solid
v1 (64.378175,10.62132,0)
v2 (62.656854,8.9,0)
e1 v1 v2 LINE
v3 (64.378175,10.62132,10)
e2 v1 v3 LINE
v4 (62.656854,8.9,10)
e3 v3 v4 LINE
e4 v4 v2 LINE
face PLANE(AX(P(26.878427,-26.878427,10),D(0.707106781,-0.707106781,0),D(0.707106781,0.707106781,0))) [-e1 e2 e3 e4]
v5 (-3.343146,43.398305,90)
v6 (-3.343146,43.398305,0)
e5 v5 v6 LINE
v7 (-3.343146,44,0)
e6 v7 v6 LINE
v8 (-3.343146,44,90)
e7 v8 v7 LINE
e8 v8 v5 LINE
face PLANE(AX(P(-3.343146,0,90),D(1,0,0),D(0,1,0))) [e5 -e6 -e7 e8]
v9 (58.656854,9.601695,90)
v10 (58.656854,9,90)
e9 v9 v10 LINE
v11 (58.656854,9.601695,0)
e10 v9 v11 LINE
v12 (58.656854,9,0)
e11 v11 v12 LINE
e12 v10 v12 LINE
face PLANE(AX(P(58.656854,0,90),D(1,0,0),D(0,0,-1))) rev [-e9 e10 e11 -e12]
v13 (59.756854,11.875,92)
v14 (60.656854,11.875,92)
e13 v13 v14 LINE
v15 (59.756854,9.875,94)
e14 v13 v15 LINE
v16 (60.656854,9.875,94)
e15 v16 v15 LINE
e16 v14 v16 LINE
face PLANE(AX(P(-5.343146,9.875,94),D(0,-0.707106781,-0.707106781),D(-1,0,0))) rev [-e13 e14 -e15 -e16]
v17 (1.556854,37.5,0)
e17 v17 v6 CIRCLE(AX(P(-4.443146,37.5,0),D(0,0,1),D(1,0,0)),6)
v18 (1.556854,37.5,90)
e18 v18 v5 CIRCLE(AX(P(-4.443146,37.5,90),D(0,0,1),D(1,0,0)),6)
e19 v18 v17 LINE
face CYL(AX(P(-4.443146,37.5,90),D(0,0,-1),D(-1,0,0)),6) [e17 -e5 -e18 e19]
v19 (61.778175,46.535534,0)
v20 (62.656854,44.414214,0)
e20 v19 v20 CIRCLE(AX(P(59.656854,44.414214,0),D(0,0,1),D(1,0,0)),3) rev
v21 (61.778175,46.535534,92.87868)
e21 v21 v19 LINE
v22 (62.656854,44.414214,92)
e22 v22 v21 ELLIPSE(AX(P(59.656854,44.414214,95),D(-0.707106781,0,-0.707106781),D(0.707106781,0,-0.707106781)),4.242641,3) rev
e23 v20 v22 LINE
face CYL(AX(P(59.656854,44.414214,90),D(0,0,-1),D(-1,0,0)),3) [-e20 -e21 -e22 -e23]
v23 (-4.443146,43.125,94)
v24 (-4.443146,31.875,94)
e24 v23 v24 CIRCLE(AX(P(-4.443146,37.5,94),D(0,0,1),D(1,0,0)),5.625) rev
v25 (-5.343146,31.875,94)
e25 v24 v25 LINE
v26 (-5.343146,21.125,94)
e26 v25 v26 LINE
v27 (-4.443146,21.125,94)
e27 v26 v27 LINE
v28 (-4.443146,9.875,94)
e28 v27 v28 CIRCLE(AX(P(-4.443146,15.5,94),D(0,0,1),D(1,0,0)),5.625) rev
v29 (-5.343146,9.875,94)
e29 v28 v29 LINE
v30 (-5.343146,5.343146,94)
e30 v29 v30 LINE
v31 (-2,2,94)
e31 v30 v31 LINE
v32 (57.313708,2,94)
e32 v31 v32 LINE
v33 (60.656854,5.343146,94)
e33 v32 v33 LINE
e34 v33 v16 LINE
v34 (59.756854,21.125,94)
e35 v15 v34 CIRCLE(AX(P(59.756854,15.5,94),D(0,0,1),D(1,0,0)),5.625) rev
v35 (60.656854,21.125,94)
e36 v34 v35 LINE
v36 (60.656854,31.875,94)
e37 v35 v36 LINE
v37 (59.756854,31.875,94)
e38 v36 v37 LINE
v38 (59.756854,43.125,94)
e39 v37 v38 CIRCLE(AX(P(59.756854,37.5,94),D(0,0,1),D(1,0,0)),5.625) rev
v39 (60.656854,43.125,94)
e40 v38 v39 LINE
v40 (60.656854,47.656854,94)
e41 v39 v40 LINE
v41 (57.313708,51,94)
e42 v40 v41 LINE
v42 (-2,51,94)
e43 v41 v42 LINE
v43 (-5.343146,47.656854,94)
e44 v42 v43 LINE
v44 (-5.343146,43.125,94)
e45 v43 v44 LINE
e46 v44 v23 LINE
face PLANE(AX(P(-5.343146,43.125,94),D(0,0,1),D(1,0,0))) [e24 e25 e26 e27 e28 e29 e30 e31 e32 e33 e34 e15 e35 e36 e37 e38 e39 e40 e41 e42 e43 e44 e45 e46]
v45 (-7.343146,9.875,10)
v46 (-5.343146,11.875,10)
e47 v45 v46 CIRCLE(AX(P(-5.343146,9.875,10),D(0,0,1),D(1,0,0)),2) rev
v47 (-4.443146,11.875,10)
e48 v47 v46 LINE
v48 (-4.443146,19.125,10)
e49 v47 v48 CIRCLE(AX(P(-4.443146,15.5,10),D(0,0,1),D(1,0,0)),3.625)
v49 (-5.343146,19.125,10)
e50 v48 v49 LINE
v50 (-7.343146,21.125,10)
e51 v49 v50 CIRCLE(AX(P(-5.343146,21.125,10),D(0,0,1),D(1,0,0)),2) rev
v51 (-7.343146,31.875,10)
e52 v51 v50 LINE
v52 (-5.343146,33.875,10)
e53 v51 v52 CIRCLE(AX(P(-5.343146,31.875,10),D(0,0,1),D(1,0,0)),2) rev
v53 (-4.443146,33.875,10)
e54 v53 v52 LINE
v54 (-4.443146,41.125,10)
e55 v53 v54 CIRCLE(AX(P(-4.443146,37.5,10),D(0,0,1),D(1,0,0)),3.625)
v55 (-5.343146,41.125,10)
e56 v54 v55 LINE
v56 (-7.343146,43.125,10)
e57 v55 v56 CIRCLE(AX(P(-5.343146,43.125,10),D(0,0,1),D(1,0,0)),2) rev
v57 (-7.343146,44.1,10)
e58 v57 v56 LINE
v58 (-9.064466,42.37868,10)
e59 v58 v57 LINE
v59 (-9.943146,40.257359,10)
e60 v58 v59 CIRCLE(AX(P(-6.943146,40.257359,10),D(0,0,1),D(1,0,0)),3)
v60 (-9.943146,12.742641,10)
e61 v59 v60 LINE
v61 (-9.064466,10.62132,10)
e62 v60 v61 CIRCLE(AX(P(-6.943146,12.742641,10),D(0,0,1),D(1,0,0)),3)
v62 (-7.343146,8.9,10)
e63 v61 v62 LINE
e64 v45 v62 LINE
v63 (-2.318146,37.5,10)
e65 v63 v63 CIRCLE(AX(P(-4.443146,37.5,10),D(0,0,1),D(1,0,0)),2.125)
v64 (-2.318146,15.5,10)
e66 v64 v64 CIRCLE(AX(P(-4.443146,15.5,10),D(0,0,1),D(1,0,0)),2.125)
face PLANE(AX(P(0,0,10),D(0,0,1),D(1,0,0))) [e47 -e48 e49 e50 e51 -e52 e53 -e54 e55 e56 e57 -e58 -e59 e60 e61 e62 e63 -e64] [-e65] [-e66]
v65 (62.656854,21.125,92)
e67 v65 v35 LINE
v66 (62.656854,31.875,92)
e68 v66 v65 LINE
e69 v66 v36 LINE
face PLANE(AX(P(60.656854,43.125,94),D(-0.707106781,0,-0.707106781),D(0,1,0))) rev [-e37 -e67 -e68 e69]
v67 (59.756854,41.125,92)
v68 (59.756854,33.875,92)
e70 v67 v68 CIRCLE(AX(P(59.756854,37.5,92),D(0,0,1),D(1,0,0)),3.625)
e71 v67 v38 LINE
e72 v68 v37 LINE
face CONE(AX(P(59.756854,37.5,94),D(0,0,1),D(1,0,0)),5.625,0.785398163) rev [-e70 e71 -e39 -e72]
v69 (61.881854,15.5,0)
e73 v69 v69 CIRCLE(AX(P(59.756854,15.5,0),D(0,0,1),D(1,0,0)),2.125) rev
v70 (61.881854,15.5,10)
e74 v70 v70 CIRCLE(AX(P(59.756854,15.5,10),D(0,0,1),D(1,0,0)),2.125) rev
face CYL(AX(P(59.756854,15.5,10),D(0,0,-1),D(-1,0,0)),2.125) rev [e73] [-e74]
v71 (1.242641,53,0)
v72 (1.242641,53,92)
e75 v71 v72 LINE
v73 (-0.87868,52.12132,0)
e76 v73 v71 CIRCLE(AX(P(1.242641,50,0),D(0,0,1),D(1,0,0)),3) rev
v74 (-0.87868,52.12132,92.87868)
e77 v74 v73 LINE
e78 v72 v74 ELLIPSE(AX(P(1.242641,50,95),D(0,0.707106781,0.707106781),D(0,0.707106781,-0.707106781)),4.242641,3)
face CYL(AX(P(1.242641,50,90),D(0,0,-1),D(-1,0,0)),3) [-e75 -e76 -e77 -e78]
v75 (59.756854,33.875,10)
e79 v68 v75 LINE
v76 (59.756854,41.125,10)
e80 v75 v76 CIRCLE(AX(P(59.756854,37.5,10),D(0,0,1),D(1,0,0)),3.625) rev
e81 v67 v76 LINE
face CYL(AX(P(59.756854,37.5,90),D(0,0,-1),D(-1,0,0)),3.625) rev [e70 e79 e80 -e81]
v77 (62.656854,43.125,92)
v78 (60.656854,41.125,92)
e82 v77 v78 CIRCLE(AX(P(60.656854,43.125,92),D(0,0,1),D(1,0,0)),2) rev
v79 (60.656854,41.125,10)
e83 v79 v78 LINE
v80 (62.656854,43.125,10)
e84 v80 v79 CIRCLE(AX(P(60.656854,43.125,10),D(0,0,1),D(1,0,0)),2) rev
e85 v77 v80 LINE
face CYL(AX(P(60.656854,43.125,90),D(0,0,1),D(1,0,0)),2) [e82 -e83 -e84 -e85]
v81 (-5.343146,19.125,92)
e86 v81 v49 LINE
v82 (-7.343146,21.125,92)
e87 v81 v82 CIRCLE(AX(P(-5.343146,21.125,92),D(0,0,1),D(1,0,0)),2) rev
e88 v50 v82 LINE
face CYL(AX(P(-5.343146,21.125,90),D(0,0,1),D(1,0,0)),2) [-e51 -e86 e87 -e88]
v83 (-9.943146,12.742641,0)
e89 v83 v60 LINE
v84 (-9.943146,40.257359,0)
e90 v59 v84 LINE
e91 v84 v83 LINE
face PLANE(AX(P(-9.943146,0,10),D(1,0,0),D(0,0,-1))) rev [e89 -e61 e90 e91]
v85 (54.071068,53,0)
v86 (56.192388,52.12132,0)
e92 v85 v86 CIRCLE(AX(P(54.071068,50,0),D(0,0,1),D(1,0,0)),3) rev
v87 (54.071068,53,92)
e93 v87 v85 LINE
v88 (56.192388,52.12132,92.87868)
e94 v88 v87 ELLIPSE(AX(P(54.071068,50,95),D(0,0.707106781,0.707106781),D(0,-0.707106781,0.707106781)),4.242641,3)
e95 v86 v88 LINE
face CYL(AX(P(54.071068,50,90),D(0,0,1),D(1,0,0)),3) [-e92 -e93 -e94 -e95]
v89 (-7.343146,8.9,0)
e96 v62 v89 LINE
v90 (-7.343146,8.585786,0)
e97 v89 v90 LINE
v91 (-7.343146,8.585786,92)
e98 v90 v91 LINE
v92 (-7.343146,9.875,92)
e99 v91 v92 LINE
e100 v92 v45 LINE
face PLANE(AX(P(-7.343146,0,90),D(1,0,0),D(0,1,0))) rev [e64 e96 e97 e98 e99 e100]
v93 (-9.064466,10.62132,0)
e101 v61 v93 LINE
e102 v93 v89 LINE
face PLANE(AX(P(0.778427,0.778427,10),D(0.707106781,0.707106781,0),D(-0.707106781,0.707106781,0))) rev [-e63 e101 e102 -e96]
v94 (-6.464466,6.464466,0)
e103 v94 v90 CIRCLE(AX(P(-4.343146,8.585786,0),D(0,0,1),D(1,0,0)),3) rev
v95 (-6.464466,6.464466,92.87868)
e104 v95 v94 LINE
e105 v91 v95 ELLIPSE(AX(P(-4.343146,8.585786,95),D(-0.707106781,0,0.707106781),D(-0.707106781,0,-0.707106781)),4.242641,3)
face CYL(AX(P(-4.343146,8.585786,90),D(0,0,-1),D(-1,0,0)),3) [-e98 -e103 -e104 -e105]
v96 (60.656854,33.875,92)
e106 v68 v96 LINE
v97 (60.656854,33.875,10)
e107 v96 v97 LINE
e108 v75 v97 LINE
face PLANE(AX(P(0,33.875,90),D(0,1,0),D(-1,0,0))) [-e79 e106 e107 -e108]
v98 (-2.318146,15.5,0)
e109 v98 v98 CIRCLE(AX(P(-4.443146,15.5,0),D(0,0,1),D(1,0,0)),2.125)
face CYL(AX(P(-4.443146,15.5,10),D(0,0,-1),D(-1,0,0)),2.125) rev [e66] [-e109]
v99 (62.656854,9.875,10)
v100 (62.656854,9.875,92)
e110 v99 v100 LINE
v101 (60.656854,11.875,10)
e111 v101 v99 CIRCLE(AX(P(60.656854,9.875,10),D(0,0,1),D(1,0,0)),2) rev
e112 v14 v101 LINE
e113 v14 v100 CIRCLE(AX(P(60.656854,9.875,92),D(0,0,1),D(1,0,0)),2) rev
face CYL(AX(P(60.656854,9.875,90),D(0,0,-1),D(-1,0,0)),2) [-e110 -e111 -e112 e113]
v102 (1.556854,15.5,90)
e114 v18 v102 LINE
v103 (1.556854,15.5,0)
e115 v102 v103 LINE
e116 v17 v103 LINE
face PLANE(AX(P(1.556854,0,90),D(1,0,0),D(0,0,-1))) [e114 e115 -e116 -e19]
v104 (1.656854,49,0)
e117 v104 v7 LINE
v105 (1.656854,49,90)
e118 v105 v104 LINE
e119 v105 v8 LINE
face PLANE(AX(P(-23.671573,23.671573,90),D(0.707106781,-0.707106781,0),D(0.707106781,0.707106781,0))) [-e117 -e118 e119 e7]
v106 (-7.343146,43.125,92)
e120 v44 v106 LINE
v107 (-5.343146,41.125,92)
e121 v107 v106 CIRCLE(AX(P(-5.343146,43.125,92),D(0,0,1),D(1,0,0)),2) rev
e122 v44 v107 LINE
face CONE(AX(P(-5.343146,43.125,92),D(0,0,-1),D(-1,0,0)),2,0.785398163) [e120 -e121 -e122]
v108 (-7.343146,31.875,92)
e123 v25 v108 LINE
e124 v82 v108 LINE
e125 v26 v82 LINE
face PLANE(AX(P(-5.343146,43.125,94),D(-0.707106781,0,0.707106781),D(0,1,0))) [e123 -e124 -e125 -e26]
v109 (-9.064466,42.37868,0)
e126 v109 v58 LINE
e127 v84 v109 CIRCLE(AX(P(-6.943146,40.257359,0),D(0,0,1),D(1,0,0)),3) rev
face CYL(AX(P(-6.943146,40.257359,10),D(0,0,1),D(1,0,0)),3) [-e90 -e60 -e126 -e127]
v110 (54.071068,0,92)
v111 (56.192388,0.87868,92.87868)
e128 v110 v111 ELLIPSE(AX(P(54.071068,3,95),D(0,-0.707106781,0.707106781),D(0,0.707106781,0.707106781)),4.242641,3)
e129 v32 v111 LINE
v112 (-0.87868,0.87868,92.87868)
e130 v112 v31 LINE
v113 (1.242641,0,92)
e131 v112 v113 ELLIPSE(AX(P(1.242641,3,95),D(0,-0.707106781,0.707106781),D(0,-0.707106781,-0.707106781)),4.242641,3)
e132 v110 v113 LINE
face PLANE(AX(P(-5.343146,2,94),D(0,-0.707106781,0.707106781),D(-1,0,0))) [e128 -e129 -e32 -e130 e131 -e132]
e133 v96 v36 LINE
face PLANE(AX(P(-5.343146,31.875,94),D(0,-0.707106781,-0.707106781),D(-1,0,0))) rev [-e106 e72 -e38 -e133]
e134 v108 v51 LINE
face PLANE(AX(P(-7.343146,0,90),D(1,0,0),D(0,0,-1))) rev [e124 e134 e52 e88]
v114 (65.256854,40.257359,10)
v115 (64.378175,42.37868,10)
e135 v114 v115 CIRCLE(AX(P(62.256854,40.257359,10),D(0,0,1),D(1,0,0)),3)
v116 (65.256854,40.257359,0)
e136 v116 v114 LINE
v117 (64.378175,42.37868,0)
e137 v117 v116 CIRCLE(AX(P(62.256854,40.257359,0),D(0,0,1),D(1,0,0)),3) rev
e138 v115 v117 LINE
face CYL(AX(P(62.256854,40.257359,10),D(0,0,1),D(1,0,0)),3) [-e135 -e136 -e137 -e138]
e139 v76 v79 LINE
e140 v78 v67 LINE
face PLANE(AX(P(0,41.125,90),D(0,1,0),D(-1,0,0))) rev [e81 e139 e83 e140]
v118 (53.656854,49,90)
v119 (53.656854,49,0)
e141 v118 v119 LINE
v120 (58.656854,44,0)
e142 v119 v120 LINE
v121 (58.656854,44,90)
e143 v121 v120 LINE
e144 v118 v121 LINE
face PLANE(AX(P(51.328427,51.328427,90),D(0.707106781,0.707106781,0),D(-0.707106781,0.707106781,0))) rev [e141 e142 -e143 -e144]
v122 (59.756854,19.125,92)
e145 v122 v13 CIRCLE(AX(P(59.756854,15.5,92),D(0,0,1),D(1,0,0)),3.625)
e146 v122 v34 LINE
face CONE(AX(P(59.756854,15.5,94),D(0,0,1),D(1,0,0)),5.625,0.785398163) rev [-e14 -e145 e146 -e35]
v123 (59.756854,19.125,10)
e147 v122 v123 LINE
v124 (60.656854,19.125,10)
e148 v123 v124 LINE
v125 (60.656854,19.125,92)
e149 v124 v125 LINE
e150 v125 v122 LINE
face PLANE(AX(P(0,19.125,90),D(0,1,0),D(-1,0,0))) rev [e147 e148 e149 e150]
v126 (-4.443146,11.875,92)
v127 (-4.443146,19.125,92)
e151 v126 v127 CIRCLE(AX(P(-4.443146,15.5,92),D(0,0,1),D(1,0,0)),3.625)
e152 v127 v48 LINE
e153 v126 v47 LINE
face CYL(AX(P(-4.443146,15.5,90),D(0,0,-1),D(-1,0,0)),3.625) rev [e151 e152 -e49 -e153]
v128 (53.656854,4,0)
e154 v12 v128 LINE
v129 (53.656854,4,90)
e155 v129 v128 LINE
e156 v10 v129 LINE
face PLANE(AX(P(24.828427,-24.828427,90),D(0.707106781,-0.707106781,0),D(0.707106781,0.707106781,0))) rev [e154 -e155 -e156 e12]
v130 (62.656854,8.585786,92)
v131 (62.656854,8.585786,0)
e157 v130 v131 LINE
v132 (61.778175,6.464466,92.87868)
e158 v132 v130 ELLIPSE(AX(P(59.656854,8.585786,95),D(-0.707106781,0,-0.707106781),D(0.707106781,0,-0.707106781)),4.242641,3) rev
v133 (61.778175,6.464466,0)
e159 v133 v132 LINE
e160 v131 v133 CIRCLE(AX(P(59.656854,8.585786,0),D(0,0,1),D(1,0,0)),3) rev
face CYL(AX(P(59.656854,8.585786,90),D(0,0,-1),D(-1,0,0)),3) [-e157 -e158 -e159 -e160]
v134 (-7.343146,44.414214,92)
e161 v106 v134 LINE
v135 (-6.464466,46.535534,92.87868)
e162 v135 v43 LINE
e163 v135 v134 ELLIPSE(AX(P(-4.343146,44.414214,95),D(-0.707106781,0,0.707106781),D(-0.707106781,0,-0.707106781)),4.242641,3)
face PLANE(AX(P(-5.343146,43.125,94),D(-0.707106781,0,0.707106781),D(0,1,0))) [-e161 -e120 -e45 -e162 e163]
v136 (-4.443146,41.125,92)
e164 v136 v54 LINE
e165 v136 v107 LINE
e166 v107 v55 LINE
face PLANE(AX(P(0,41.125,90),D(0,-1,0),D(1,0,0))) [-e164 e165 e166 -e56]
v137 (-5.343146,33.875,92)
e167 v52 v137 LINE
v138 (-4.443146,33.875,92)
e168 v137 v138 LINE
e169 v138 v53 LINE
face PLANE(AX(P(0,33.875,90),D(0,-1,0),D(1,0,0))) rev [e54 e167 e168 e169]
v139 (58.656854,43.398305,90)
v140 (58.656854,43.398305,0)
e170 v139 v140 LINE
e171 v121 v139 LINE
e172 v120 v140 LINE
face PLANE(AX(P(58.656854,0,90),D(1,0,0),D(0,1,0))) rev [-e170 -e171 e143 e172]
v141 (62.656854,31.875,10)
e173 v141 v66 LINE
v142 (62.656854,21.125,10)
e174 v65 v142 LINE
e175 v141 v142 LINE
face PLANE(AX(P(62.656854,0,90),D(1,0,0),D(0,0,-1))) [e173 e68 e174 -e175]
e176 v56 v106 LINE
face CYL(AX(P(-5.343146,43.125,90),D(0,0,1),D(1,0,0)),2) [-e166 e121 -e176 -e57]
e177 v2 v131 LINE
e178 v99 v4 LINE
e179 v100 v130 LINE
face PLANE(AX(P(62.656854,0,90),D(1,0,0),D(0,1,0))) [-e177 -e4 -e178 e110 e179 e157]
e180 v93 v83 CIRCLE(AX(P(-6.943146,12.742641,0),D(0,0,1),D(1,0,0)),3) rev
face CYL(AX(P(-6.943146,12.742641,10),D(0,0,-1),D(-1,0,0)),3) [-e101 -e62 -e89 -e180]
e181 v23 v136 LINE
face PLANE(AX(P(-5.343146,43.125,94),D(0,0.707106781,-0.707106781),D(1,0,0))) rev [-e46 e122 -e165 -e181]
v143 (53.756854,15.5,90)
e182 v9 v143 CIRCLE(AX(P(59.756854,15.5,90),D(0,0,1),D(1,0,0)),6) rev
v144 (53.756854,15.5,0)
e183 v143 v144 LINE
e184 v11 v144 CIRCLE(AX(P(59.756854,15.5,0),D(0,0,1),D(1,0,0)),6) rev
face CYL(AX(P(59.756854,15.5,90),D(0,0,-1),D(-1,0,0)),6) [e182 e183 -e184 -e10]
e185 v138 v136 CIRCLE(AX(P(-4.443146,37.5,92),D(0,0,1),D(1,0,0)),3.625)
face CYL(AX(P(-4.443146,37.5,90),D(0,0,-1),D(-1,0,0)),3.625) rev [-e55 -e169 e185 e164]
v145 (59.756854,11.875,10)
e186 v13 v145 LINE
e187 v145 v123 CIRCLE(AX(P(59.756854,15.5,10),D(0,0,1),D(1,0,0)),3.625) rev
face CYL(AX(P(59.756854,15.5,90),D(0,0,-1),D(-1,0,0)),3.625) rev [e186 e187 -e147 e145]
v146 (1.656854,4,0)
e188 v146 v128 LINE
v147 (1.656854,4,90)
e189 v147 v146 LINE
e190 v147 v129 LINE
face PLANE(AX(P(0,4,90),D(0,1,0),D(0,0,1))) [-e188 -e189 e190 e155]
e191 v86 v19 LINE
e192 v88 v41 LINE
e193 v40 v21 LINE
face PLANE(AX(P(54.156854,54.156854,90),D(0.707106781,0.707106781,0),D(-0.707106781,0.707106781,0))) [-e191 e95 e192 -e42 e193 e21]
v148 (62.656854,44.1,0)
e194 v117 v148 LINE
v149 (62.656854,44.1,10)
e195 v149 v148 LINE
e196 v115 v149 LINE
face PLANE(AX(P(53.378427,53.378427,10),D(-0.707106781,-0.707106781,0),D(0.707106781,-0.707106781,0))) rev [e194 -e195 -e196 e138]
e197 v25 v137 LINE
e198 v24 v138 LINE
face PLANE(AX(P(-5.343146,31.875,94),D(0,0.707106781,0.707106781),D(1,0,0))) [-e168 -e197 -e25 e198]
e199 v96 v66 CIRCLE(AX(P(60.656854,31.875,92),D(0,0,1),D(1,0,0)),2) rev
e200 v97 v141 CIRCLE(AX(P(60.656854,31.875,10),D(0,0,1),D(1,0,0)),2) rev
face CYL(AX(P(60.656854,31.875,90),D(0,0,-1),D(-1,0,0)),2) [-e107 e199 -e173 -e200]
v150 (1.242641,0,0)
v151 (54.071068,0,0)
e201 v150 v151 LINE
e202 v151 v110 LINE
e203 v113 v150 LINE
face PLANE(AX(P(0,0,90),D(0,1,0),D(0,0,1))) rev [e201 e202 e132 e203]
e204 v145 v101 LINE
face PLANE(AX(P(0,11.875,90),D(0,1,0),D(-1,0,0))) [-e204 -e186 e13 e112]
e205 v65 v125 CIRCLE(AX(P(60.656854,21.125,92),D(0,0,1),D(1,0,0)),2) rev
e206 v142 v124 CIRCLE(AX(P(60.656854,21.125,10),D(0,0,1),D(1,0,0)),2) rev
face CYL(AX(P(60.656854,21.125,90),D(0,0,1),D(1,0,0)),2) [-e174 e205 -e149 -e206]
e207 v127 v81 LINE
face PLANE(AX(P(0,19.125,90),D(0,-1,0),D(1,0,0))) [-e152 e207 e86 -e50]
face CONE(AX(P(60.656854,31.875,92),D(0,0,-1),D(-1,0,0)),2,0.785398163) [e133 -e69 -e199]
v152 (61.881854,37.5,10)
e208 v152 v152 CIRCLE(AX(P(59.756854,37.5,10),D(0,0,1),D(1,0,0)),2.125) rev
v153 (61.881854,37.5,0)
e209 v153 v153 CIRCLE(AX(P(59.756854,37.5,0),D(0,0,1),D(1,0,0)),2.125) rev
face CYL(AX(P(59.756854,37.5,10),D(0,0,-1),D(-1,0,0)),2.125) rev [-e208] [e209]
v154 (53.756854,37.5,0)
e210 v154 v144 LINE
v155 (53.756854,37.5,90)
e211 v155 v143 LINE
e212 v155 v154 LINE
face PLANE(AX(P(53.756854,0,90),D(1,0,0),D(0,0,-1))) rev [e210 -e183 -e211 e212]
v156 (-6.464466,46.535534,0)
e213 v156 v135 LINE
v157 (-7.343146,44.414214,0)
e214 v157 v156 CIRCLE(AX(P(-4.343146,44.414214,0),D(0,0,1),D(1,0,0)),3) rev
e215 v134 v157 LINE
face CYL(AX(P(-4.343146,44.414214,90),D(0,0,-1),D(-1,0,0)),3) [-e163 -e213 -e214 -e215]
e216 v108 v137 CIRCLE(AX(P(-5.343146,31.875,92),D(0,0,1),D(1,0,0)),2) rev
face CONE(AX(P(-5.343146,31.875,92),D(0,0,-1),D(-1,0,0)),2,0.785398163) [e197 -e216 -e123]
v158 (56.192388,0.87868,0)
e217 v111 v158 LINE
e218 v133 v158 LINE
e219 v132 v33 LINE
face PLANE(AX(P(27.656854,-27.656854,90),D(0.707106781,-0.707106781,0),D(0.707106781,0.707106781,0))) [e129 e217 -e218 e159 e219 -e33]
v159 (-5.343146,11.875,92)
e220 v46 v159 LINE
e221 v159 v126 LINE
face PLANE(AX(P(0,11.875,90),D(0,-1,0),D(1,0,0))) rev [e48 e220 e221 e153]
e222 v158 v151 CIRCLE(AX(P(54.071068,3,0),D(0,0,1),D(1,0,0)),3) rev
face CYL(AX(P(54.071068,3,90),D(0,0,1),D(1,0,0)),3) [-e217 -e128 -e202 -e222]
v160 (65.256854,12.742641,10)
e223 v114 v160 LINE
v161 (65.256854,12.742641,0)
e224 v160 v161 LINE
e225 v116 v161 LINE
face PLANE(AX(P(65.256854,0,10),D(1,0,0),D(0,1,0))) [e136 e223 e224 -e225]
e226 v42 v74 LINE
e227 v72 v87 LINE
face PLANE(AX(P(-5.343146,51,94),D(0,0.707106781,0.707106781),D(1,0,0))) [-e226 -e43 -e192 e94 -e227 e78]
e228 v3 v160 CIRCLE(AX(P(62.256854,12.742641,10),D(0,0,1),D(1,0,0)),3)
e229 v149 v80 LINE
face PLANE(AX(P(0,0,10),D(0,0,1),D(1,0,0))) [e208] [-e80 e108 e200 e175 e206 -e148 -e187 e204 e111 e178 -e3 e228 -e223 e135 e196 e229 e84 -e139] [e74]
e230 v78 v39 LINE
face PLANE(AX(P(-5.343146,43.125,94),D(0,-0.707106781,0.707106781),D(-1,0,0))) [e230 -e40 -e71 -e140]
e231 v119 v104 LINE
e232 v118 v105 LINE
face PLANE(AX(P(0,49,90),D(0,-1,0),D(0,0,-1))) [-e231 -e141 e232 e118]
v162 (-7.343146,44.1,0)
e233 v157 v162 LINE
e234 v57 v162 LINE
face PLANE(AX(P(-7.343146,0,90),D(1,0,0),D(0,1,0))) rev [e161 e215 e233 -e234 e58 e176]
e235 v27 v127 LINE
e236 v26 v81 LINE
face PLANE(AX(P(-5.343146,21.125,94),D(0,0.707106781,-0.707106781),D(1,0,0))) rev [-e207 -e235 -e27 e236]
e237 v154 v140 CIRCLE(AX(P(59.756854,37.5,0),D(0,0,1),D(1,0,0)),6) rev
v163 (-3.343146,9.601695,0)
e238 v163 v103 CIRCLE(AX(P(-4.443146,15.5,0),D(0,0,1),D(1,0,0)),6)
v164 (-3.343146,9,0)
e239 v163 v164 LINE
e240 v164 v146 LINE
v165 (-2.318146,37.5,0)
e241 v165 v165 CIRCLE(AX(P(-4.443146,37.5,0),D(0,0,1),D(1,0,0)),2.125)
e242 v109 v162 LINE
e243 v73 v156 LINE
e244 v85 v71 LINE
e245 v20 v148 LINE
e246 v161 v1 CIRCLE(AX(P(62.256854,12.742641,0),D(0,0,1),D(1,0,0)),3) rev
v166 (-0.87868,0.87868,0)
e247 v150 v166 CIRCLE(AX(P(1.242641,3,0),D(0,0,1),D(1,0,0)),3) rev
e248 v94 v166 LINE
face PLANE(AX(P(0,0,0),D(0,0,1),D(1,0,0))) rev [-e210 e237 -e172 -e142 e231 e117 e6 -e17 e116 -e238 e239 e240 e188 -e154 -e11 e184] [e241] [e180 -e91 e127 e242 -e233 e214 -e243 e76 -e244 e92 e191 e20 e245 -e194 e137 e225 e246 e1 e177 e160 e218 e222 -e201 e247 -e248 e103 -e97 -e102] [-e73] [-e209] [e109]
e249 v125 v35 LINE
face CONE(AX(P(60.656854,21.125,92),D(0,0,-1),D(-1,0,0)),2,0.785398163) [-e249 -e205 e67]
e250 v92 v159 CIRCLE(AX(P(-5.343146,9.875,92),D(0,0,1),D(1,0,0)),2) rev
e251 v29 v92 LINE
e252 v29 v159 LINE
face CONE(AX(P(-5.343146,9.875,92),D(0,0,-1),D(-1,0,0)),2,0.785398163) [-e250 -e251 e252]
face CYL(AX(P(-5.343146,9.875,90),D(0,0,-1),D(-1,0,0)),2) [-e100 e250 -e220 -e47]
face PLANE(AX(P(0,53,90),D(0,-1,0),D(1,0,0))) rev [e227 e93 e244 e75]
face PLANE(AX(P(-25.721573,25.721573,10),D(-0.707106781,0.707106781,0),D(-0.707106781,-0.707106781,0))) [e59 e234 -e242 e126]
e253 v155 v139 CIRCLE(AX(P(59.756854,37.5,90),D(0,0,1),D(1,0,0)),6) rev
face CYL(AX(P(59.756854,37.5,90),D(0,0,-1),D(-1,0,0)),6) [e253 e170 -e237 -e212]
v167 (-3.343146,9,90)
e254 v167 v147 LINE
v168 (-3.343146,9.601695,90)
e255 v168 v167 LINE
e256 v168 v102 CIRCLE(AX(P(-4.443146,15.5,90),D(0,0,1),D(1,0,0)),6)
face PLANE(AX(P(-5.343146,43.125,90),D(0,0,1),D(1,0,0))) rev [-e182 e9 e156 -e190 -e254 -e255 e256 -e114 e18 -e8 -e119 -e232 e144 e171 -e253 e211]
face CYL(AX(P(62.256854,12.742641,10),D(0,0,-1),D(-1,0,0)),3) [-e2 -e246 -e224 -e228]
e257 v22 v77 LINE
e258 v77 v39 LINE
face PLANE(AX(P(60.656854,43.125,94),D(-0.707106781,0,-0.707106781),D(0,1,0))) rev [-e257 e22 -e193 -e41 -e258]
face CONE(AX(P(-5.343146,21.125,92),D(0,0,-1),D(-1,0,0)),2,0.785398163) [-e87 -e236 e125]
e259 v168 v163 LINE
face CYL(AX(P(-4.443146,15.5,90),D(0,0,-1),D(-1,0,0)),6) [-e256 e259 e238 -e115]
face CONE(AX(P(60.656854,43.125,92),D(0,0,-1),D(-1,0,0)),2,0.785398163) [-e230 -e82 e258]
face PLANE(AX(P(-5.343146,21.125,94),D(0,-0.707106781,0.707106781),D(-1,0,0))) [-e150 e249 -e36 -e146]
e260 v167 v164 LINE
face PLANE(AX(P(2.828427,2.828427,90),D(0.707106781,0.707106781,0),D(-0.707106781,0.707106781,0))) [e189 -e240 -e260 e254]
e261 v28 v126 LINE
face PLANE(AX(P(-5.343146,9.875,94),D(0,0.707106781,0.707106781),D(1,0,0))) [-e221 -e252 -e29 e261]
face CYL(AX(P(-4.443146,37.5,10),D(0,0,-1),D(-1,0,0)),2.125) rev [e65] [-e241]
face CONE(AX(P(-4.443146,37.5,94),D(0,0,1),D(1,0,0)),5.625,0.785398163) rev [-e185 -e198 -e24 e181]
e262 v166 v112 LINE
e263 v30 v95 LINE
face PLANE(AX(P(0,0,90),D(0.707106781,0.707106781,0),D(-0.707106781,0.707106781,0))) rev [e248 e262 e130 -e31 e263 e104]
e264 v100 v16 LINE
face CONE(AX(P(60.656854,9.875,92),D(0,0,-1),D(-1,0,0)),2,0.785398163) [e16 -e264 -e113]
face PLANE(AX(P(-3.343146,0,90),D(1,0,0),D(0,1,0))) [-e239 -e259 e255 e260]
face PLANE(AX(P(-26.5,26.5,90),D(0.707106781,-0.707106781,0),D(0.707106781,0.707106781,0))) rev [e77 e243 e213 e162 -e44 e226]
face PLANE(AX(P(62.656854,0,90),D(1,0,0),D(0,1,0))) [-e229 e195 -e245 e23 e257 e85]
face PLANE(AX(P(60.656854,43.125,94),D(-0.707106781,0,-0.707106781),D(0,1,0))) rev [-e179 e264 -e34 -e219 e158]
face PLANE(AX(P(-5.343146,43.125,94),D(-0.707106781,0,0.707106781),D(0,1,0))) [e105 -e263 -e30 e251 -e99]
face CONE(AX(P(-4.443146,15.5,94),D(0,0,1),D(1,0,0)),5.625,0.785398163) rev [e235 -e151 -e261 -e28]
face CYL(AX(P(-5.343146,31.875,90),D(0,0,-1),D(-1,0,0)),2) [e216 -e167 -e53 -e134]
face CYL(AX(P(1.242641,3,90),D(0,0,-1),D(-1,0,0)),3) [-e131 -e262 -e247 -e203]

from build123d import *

# Parameters (mm, degrees)
BOSS_EXTRUDE1_DEPTH = 90
SKETCH1_3_R         = 2.125
BOSS_EXTRUDE2_DEPTH = 10
FILLET1_R           = 2
BOSS_EXTRUDE3_START = 4
BOSS_EXTRUDE3_DEPTH = 4
CHAMFER1_SIZE       = 2
FILLET3_R           = 3


with BuildPart() as part:
    # Sketch1 → Boss-Extrude1 (new body)
    with BuildSketch(Plane.XY):
        with BuildLine():
            Line((55.313708499, 53), (0, 53))
            Line((0, 53), (-7.343145751, 45.656854249))
            Line((-7.343145751, 45.656854249), (-7.343145751, 41.125))
            Line((-7.343145751, 41.125), (-4.443145751, 41.125))
            ThreePointArc((-4.443145751, 41.125), (-0.818145751, 37.5), (-4.443145751, 33.875))
            Line((-4.443145751, 33.875), (-7.343145751, 33.875))
            Line((-7.343145751, 33.875), (-7.343145751, 19.125))
            Line((-7.343145751, 19.125), (-4.443145751, 19.125))
            ThreePointArc((-4.443145751, 19.125), (-0.818145751, 15.5), (-4.443145751, 11.875))
            Line((-4.443145751, 11.875), (-7.343145751, 11.875))
            Line((-7.343145751, 11.875), (-7.343145751, 7.343145751))
            Line((-7.343145751, 7.343145751), (0, 0))
            Line((0, 0), (55.313708499, 0))
            Line((55.313708499, 0), (62.656854249, 7.343145751))
            Line((62.656854249, 7.343145751), (62.656854249, 11.875))
            Line((62.656854249, 11.875), (59.756854249, 11.875))
            ThreePointArc((59.756854249, 11.875), (56.131854249, 15.5), (59.756854249, 19.125))
            Line((59.756854249, 19.125), (62.656854249, 19.125))
            Line((62.656854249, 19.125), (62.656854249, 33.875))
            Line((62.656854249, 33.875), (59.756854249, 33.875))
            ThreePointArc((59.756854249, 33.875), (56.131854249, 37.5), (59.756854249, 41.125))
            Line((59.756854249, 41.125), (62.656854249, 41.125))
            Line((62.656854249, 41.125), (62.656854249, 45.656854249))
            Line((62.656854249, 45.656854249), (55.313708499, 53))
        make_face()
        with BuildLine():
            Line((53.656854249, 4), (1.656854249, 4))
            Line((1.656854249, 4), (-3.343145751, 9))
            Line((-3.343145751, 9), (-3.343145751, 9.601695159))
            ThreePointArc((-3.343145751, 9.601695159), (0.172046553, 11.665942097), (1.556854249, 15.5))
            Line((1.556854249, 15.5), (1.556854249, 37.5))
            ThreePointArc((1.556854249, 37.5), (0.172046553, 41.334057903), (-3.343145751, 43.398304841))
            Line((-3.343145751, 43.398304841), (-3.343145751, 44))
            Line((-3.343145751, 44), (1.656854249, 49))
            Line((1.656854249, 49), (53.656854249, 49))
            Line((53.656854249, 49), (58.656854249, 44))
            Line((58.656854249, 44), (58.656854249, 43.398304841))
            ThreePointArc((58.656854249, 43.398304841), (55.141661946, 41.334057903), (53.756854249, 37.5))
            Line((53.756854249, 37.5), (53.756854249, 15.5))
            ThreePointArc((53.756854249, 15.5), (55.141661946, 11.665942097), (58.656854249, 9.601695159))
            Line((58.656854249, 9.601695159), (58.656854249, 9))
            Line((58.656854249, 9), (53.656854249, 4))
        make_face(mode=Mode.SUBTRACT)
    extrude(amount=BOSS_EXTRUDE1_DEPTH)

    # Sketch1<3> → Boss-Extrude2 (add)
    # profile 1 of 2: a face of its own
    with BuildSketch(Plane.XY):
        with BuildLine():
            ThreePointArc((-4.443145751, 33.875), (-0.818145751, 37.5), (-4.443145751, 41.125))
            Line((-4.443145751, 41.125), (-7.343145751, 41.125))
            Line((-7.343145751, 41.125), (-7.343145751, 44.1))
            Line((-7.343145751, 44.1), (-9.943145751, 41.5))
            Line((-9.943145751, 41.5), (-9.943145751, 11.5))
            Line((-9.943145751, 11.5), (-7.343145751, 8.9))
            Line((-7.343145751, 8.9), (-7.343145751, 11.875))
            Line((-7.343145751, 11.875), (-4.443145751, 11.875))
            ThreePointArc((-4.443145751, 11.875), (-0.818145751, 15.5), (-4.443145751, 19.125))
            Line((-4.443145751, 19.125), (-7.343145751, 19.125))
            Line((-7.343145751, 19.125), (-7.343145751, 33.875))
            Line((-7.343145751, 33.875), (-4.443145751, 33.875))
        make_face()
        with Locations((-4.443145751, 15.5)):
            Circle(SKETCH1_3_R, mode=Mode.SUBTRACT)
        with Locations((-4.443145751, 37.5)):
            Circle(SKETCH1_3_R, mode=Mode.SUBTRACT)
    # profile 2 of 2: a face of its own
    with BuildSketch(Plane.XY):
        with BuildLine():
            Line((65.256854249, 41.5), (62.656854249, 44.1))
            Line((62.656854249, 44.1), (62.656854249, 41.125))
            Line((62.656854249, 41.125), (59.756854249, 41.125))
            ThreePointArc((59.756854249, 41.125), (56.131854249, 37.5), (59.756854249, 33.875))
            Line((59.756854249, 33.875), (62.656854249, 33.875))
            Line((62.656854249, 33.875), (62.656854249, 19.125))
            Line((62.656854249, 19.125), (59.756854249, 19.125))
            ThreePointArc((59.756854249, 19.125), (56.131854249, 15.5), (59.756854249, 11.875))
            Line((59.756854249, 11.875), (62.656854249, 11.875))
            Line((62.656854249, 11.875), (62.656854249, 8.9))
            Line((62.656854249, 8.9), (65.256854249, 11.5))
            Line((65.256854249, 11.5), (65.256854249, 41.5))
        make_face()
        with Locations((59.756854249, 37.5)):
            Circle(SKETCH1_3_R, mode=Mode.SUBTRACT)
        with Locations((59.756854249, 15.5)):
            Circle(SKETCH1_3_R, mode=Mode.SUBTRACT)
    extrude(amount=BOSS_EXTRUDE2_DEPTH)

    # Fillet1
    fillet1_edges = [part.edges().sort_by_distance(p)[0] for p in [
        (62.656854249, 41.125, 50),
        (62.656854249, 33.875, 50),
        (62.656854249, 19.125, 50),
        (62.656854249, 11.875, 50),
        (-7.343145751, 11.875, 50),
        (-7.343145751, 19.125, 50),
        (-7.343145751, 33.875, 50),
        (-7.343145751, 41.125, 50),
    ]]
    fillet(fillet1_edges, radius=FILLET1_R)

    # Sketch2 → Boss-Extrude3 (add)
    with BuildSketch(Plane.XY.offset(90).offset(BOSS_EXTRUDE3_START)):
        with BuildLine():
            Line((-7.343145751, 31.875), (-7.343145751, 21.125))
            ThreePointArc((-7.343145751, 21.125), (-6.757359313, 19.710786438), (-5.343145751, 19.125))
            Line((-5.343145751, 19.125), (-4.443145751, 19.125))
            ThreePointArc((-4.443145751, 19.125), (-0.818145751, 15.5), (-4.443145751, 11.875))
            Line((-4.443145751, 11.875), (-5.343145751, 11.875))
            ThreePointArc((-5.343145751, 11.875), (-6.757359313, 11.289213562), (-7.343145751, 9.875))
            Line((-7.343145751, 9.875), (-7.343145751, 7.343145751))
            Line((-7.343145751, 7.343145751), (0, 0))
            Line((0, 0), (55.313708499, 0))
            Line((55.313708499, 0), (62.656854249, 7.343145751))
            Line((62.656854249, 7.343145751), (62.656854249, 9.875))
            ThreePointArc((62.656854249, 9.875), (62.071067812, 11.289213562), (60.656854249, 11.875))
            Line((60.656854249, 11.875), (59.756854249, 11.875))
            ThreePointArc((59.756854249, 11.875), (56.131854249, 15.5), (59.756854249, 19.125))
            Line((59.756854249, 19.125), (60.656854249, 19.125))
            ThreePointArc((60.656854249, 19.125), (62.071067812, 19.710786438), (62.656854249, 21.125))
            Line((62.656854249, 21.125), (62.656854249, 31.875))
            ThreePointArc((62.656854249, 31.875), (62.071067812, 33.289213562), (60.656854249, 33.875))
            Line((60.656854249, 33.875), (59.756854249, 33.875))
            ThreePointArc((59.756854249, 33.875), (56.131854249, 37.5), (59.756854249, 41.125))
            Line((59.756854249, 41.125), (60.656854249, 41.125))
            ThreePointArc((60.656854249, 41.125), (62.071067812, 41.710786438), (62.656854249, 43.125))
            Line((62.656854249, 43.125), (62.656854249, 45.656854249))
            Line((62.656854249, 45.656854249), (55.313708499, 53))
            Line((55.313708499, 53), (0, 53))
            Line((0, 53), (-7.343145751, 45.656854249))
            Line((-7.343145751, 45.656854249), (-7.343145751, 43.125))
            ThreePointArc((-7.343145751, 43.125), (-6.757359313, 41.710786438), (-5.343145751, 41.125))
            Line((-5.343145751, 41.125), (-4.443145751, 41.125))
            ThreePointArc((-4.443145751, 41.125), (-0.818145751, 37.5), (-4.443145751, 33.875))
            Line((-4.443145751, 33.875), (-5.343145751, 33.875))
            ThreePointArc((-5.343145751, 33.875), (-6.757359313, 33.289213562), (-7.343145751, 31.875))
        make_face()
    extrude(amount=-BOSS_EXTRUDE3_DEPTH)

    # Chamfer1
    chamfer1_edges = [part.edges().sort_by_distance(p)[0] for p in [
        (-7.343145751, 44.390927125, 94),
        (-6.757359313, 41.710786438, 94),
        (-4.893145751, 41.125, 94),
        (-0.818145751, 37.5, 94),
        (-4.893145751, 33.875, 94),
        (-6.757359313, 33.289213562, 94),
        (-7.343145751, 26.5, 94),
        (-6.757359313, 19.710786438, 94),
        (-4.893145751, 19.125, 94),
        (-0.818145751, 15.5, 94),
        (-4.893145751, 11.875, 94),
        (-6.757359313, 11.289213562, 94),
        (-7.343145751, 8.609072875, 94),
        (27.656854249, 0, 94),
        (62.656854249, 8.609072875, 94),
        (62.071067812, 11.289213562, 94),
        (60.206854249, 11.875, 94),
        (56.131854249, 15.5, 94),
        (60.206854249, 19.125, 94),
        (62.071067812, 19.710786438, 94),
        (62.656854249, 26.5, 94),
        (62.071067812, 33.289213562, 94),
        (60.206854249, 33.875, 94),
        (56.131854249, 37.5, 94),
        (60.206854249, 41.125, 94),
        (62.071067812, 41.710786438, 94),
        (62.656854249, 44.390927125, 94),
        (27.656854249, 53, 94),
    ]]
    chamfer(chamfer1_edges, length=CHAMFER1_SIZE - 0.0001)  # a hair under: the kernel refuses the full size

    # Fillet3
    fillet3_edges = [part.edges().sort_by_distance(p)[0] for p in [
        (-9.943145751, 41.5, 5),
        (-9.943145751, 11.5, 5),
        (65.256854249, 11.5, 5),
        (65.256854249, 41.5, 5),
        (62.656854249, 7.343145751, 46.00005),
        (55.313708499, 0, 46.00005),
        (0, 0, 46.00005),
        (-7.343145751, 7.343145751, 46.00005),
        (55.313708499, 53, 46.00005),
        (62.656854249, 45.656854249, 46.00005),
        (-7.343145751, 45.656854249, 46.00005),
        (0, 53, 46.00005),
    ]]
    fillet(fillet3_edges, radius=FILLET3_R)


solid = part.part
